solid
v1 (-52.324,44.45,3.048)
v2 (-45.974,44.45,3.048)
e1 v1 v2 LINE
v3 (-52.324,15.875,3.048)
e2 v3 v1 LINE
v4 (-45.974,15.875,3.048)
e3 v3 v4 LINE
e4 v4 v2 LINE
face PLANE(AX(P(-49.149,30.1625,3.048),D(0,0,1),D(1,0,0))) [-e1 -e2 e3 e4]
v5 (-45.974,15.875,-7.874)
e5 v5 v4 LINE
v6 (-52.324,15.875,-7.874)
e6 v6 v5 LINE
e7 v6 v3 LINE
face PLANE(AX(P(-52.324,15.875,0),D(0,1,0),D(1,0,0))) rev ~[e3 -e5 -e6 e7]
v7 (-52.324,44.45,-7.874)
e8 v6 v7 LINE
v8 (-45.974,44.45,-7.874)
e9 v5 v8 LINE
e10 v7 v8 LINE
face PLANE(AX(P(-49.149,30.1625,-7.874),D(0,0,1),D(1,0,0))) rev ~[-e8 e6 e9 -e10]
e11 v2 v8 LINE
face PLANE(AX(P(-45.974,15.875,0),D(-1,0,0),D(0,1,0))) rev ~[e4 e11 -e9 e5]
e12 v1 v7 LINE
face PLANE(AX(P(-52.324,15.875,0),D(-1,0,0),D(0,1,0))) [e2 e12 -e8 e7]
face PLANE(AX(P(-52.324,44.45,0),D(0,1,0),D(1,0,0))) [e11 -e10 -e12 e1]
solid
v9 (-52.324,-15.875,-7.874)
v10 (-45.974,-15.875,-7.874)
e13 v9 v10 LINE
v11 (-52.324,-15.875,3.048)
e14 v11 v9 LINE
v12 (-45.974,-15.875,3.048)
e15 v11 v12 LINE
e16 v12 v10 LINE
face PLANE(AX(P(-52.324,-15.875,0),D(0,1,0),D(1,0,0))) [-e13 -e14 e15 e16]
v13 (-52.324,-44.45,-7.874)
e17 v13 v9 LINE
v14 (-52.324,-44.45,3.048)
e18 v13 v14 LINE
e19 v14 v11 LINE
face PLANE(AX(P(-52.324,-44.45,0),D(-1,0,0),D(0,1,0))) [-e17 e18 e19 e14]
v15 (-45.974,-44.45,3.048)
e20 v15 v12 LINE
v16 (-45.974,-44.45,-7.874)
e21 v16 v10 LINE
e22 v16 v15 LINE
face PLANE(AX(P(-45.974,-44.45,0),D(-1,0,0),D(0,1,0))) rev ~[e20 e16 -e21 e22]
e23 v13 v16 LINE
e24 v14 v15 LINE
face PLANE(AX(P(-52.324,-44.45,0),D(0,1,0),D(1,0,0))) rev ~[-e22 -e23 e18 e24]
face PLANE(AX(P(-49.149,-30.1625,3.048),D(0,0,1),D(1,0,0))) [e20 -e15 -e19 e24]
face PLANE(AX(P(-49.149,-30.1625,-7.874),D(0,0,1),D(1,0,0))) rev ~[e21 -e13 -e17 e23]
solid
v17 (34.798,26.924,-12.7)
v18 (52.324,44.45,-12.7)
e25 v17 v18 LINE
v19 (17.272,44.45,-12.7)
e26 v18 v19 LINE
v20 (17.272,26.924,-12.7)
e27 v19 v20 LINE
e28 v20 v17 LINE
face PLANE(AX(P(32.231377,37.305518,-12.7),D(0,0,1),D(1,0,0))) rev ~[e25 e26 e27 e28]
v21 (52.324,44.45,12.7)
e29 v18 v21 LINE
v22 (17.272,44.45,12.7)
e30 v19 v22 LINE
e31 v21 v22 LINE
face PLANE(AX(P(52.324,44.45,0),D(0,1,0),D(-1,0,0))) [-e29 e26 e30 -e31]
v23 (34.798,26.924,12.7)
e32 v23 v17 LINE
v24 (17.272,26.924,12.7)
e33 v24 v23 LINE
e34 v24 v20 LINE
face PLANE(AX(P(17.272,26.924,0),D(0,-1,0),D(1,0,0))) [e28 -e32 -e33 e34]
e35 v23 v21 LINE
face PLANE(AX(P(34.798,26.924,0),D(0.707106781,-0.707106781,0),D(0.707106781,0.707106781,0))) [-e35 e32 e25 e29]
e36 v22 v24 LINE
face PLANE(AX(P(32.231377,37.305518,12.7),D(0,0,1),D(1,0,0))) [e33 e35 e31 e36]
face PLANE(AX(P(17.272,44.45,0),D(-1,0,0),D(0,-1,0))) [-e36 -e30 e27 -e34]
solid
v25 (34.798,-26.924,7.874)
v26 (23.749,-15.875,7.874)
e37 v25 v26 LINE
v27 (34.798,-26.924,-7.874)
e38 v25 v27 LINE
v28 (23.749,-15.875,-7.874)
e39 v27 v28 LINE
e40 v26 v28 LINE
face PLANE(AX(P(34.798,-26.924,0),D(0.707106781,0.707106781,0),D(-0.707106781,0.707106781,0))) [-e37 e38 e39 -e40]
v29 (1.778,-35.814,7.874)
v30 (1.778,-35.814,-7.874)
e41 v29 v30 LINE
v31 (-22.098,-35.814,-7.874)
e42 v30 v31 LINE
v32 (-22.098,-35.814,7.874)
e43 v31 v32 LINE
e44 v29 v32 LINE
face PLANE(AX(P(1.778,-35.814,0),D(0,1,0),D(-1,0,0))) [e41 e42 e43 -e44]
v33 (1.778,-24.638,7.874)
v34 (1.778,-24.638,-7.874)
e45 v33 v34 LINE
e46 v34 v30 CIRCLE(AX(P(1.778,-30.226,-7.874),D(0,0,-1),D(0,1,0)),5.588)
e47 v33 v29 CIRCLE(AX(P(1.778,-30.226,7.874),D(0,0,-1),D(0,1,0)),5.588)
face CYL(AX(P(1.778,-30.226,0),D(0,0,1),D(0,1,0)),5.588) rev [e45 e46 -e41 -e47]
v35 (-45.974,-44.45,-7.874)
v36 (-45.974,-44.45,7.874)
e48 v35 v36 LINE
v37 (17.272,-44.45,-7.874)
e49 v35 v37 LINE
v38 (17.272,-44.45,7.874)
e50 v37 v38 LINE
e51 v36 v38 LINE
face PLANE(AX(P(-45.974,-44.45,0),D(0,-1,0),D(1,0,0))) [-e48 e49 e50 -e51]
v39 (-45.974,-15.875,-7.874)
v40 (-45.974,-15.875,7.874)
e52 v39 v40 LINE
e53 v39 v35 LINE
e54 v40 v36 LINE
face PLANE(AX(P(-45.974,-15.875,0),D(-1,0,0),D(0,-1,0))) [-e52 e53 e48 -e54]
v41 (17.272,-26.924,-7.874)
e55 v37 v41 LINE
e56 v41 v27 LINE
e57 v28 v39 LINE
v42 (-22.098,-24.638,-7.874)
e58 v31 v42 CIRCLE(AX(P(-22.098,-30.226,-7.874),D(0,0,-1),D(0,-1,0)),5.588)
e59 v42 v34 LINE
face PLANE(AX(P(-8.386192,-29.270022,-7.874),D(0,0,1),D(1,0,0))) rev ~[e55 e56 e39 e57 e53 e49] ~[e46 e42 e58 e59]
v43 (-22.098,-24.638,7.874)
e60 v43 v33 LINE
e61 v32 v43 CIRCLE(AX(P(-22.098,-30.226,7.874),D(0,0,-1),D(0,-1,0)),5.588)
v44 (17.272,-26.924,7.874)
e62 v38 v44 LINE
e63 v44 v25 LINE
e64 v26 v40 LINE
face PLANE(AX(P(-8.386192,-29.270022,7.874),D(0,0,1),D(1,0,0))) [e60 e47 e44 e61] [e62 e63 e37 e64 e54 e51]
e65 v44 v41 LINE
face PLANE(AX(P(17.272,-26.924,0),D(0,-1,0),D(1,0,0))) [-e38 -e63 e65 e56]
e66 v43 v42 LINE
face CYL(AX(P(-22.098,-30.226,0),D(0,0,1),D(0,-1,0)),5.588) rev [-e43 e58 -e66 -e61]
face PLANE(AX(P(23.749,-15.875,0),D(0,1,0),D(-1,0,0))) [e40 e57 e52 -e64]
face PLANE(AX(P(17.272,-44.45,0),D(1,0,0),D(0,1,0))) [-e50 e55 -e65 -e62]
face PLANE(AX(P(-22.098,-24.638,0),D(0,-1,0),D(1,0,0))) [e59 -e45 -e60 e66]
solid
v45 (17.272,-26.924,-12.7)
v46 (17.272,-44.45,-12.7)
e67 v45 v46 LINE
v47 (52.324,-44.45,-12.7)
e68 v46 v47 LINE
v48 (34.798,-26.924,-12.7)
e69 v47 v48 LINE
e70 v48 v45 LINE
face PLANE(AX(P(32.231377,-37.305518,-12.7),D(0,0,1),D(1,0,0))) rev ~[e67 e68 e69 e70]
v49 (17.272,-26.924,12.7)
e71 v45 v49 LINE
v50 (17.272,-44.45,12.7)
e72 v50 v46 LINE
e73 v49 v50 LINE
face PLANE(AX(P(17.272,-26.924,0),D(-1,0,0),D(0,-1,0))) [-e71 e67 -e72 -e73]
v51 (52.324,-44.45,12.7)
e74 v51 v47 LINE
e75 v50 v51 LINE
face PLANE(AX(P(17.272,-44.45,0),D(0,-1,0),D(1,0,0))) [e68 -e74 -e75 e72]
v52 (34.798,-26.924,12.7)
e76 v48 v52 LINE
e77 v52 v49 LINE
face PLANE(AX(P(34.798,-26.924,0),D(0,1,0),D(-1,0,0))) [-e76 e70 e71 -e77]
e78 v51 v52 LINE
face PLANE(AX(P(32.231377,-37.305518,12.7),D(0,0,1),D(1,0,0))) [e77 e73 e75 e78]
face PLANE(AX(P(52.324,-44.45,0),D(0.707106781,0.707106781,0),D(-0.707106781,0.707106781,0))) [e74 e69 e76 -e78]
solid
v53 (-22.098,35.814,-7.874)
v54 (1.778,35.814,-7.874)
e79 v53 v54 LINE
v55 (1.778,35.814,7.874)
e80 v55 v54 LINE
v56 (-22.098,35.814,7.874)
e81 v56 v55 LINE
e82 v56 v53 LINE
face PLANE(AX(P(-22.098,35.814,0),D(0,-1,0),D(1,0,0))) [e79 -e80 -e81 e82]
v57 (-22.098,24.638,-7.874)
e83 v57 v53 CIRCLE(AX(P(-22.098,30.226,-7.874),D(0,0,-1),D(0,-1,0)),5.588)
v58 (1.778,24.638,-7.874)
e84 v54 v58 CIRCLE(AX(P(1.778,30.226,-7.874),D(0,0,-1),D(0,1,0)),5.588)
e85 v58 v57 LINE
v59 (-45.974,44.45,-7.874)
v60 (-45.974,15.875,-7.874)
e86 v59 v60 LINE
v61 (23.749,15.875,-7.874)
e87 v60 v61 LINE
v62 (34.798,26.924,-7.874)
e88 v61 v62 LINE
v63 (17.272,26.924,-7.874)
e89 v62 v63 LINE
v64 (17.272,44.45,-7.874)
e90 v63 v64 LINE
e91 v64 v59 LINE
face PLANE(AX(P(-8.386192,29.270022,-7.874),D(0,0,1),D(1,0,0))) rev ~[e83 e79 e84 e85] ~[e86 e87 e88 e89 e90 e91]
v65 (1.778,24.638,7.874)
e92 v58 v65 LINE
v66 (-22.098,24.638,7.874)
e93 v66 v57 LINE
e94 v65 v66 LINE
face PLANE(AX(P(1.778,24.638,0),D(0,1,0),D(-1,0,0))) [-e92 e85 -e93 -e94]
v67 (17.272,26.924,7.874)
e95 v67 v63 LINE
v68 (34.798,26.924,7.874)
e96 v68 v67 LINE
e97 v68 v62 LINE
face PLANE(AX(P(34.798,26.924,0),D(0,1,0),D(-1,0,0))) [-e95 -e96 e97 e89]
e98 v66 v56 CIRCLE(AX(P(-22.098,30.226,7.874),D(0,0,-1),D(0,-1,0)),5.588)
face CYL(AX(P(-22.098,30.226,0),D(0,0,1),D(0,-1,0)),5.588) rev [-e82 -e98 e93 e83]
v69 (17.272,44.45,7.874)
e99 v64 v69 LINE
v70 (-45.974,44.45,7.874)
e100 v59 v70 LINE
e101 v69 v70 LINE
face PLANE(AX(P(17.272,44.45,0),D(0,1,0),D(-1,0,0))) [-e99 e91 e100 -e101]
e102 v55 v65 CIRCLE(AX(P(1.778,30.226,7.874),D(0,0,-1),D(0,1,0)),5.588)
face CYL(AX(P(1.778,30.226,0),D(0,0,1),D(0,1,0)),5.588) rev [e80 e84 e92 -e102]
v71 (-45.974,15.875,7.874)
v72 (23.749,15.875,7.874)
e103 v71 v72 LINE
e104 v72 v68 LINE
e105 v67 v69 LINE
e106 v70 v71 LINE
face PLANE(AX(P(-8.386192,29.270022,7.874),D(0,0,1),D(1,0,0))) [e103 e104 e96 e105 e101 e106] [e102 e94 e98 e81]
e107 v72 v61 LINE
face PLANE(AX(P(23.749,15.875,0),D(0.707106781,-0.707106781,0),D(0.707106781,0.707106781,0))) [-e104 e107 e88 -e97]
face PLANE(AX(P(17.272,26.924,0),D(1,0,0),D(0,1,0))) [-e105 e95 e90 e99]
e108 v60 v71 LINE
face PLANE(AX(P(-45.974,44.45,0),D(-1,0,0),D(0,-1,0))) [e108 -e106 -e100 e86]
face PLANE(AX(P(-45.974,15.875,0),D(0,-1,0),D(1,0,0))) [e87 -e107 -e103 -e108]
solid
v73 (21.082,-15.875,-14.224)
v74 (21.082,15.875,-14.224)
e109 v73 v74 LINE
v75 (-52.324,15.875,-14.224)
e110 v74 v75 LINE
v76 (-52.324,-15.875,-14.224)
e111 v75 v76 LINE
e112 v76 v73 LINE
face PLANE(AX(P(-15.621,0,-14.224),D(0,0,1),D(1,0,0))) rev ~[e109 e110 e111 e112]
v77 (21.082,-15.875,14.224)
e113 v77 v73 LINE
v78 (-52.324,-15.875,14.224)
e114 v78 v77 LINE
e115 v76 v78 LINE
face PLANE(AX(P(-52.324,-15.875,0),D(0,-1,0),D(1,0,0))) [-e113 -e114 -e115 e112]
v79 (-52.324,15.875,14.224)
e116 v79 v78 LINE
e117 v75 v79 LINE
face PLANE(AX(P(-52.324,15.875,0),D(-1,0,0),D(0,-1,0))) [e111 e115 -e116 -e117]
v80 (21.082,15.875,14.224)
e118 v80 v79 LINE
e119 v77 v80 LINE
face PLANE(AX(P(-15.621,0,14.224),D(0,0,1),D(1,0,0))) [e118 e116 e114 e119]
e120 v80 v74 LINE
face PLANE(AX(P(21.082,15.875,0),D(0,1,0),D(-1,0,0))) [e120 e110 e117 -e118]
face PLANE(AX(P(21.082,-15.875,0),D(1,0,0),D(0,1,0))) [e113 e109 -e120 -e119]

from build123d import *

# Parameters (mm, degrees)
F1_DEPTH = 14.224
F2_DEPTH = 12.7
F3_DEPTH = 7.874
F0_W     = 6.35
F0_H     = 28.575
F4_DEPTH = 7.874
F5_DEPTH = 3.048


with BuildPart() as f1:
    # F0 (on Top) → F1 (new body, symmetric)
    with BuildSketch(Plane.XY):
        Polygon((21.082, 15.875), (-45.974, 15.875), (-52.324, 15.875), (-52.324, -15.875), (-45.974, -15.875), (21.082, -15.875), align=None)
    extrude(amount=F1_DEPTH, both=True)


with BuildPart() as f2:
    # F0 (on Top) → F2 (new body, symmetric)
    with BuildSketch(Plane.XY):
        Polygon((34.798, 26.924), (52.324, 44.45), (17.272, 44.45), (17.272, 26.924), align=None)
    extrude(amount=F2_DEPTH, both=True)


with BuildPart() as f2b:
    # F0 (on Top) → F2, piece 2 (new body, symmetric)
    with BuildSketch(Plane.XY):
        Polygon((52.324, -44.45), (34.798, -26.924), (17.272, -26.924), (17.272, -44.45), align=None)
    extrude(amount=F2_DEPTH, both=True)


with BuildPart() as f3:
    # F0 (on Top) → F3 (new body, symmetric)
    with BuildSketch(Plane.XY):
        Polygon((17.272, 26.924), (17.272, 44.45), (-45.974, 44.45), (-45.974, 15.875), (21.082, 15.875), (23.749, 15.875), (34.798, 26.924), align=None)
        with BuildLine():
            Line((1.778, 24.638), (-22.098, 24.638))
            ThreePointArc((-22.098, 24.638), (-27.686, 30.226), (-22.098, 35.814))
            Line((-22.098, 35.814), (1.778, 35.814))
            ThreePointArc((1.778, 35.814), (7.366, 30.226), (1.778, 24.638))
        make_face(mode=Mode.SUBTRACT)
    extrude(amount=F3_DEPTH, both=True)


with BuildPart() as f3b:
    # F0 (on Top) → F3, piece 2 (new body, symmetric)
    with BuildSketch(Plane.XY):
        Polygon((23.749, -15.875), (21.082, -15.875), (-45.974, -15.875), (-45.974, -44.45), (17.272, -44.45), (17.272, -26.924), (34.798, -26.924), align=None)
        with BuildLine():
            ThreePointArc((-22.098, -35.814), (-27.686, -30.226), (-22.098, -24.638))
            Line((-22.098, -24.638), (1.778, -24.638))
            ThreePointArc((1.778, -24.638), (7.366, -30.226), (1.778, -35.814))
            Line((1.778, -35.814), (-22.098, -35.814))
        make_face(mode=Mode.SUBTRACT)
    extrude(amount=F3_DEPTH, both=True)


with BuildPart() as f4:
    # F0 (on Top) → F4 (new body)
    with BuildSketch(Plane.XY):
        with Locations((-49.149, -30.1625)):
            Rectangle(F0_W, F0_H)
    extrude(amount=-F4_DEPTH)

    # F0 (on Top) → F5, piece 2 (join)
    with BuildSketch(Plane.XY):
        with Locations((-49.149, -30.1625)):
            Rectangle(F0_W, F0_H)
    extrude(amount=F5_DEPTH)


with BuildPart() as f4b:
    # F0 (on Top) → F4, piece 2 (new body)
    with BuildSketch(Plane.XY):
        with Locations((-49.149, 30.1625)):
            Rectangle(F0_W, F0_H)
    extrude(amount=-F4_DEPTH)

    # F0 (on Top) → F5 (join)
    with BuildSketch(Plane.XY):
        with Locations((-49.149, 30.1625)):
            Rectangle(F0_W, F0_H)
    extrude(amount=F5_DEPTH)


solid = Compound([f1.part, f2.part, f2b.part, f3.part, f3b.part, f4.part, f4b.part])
